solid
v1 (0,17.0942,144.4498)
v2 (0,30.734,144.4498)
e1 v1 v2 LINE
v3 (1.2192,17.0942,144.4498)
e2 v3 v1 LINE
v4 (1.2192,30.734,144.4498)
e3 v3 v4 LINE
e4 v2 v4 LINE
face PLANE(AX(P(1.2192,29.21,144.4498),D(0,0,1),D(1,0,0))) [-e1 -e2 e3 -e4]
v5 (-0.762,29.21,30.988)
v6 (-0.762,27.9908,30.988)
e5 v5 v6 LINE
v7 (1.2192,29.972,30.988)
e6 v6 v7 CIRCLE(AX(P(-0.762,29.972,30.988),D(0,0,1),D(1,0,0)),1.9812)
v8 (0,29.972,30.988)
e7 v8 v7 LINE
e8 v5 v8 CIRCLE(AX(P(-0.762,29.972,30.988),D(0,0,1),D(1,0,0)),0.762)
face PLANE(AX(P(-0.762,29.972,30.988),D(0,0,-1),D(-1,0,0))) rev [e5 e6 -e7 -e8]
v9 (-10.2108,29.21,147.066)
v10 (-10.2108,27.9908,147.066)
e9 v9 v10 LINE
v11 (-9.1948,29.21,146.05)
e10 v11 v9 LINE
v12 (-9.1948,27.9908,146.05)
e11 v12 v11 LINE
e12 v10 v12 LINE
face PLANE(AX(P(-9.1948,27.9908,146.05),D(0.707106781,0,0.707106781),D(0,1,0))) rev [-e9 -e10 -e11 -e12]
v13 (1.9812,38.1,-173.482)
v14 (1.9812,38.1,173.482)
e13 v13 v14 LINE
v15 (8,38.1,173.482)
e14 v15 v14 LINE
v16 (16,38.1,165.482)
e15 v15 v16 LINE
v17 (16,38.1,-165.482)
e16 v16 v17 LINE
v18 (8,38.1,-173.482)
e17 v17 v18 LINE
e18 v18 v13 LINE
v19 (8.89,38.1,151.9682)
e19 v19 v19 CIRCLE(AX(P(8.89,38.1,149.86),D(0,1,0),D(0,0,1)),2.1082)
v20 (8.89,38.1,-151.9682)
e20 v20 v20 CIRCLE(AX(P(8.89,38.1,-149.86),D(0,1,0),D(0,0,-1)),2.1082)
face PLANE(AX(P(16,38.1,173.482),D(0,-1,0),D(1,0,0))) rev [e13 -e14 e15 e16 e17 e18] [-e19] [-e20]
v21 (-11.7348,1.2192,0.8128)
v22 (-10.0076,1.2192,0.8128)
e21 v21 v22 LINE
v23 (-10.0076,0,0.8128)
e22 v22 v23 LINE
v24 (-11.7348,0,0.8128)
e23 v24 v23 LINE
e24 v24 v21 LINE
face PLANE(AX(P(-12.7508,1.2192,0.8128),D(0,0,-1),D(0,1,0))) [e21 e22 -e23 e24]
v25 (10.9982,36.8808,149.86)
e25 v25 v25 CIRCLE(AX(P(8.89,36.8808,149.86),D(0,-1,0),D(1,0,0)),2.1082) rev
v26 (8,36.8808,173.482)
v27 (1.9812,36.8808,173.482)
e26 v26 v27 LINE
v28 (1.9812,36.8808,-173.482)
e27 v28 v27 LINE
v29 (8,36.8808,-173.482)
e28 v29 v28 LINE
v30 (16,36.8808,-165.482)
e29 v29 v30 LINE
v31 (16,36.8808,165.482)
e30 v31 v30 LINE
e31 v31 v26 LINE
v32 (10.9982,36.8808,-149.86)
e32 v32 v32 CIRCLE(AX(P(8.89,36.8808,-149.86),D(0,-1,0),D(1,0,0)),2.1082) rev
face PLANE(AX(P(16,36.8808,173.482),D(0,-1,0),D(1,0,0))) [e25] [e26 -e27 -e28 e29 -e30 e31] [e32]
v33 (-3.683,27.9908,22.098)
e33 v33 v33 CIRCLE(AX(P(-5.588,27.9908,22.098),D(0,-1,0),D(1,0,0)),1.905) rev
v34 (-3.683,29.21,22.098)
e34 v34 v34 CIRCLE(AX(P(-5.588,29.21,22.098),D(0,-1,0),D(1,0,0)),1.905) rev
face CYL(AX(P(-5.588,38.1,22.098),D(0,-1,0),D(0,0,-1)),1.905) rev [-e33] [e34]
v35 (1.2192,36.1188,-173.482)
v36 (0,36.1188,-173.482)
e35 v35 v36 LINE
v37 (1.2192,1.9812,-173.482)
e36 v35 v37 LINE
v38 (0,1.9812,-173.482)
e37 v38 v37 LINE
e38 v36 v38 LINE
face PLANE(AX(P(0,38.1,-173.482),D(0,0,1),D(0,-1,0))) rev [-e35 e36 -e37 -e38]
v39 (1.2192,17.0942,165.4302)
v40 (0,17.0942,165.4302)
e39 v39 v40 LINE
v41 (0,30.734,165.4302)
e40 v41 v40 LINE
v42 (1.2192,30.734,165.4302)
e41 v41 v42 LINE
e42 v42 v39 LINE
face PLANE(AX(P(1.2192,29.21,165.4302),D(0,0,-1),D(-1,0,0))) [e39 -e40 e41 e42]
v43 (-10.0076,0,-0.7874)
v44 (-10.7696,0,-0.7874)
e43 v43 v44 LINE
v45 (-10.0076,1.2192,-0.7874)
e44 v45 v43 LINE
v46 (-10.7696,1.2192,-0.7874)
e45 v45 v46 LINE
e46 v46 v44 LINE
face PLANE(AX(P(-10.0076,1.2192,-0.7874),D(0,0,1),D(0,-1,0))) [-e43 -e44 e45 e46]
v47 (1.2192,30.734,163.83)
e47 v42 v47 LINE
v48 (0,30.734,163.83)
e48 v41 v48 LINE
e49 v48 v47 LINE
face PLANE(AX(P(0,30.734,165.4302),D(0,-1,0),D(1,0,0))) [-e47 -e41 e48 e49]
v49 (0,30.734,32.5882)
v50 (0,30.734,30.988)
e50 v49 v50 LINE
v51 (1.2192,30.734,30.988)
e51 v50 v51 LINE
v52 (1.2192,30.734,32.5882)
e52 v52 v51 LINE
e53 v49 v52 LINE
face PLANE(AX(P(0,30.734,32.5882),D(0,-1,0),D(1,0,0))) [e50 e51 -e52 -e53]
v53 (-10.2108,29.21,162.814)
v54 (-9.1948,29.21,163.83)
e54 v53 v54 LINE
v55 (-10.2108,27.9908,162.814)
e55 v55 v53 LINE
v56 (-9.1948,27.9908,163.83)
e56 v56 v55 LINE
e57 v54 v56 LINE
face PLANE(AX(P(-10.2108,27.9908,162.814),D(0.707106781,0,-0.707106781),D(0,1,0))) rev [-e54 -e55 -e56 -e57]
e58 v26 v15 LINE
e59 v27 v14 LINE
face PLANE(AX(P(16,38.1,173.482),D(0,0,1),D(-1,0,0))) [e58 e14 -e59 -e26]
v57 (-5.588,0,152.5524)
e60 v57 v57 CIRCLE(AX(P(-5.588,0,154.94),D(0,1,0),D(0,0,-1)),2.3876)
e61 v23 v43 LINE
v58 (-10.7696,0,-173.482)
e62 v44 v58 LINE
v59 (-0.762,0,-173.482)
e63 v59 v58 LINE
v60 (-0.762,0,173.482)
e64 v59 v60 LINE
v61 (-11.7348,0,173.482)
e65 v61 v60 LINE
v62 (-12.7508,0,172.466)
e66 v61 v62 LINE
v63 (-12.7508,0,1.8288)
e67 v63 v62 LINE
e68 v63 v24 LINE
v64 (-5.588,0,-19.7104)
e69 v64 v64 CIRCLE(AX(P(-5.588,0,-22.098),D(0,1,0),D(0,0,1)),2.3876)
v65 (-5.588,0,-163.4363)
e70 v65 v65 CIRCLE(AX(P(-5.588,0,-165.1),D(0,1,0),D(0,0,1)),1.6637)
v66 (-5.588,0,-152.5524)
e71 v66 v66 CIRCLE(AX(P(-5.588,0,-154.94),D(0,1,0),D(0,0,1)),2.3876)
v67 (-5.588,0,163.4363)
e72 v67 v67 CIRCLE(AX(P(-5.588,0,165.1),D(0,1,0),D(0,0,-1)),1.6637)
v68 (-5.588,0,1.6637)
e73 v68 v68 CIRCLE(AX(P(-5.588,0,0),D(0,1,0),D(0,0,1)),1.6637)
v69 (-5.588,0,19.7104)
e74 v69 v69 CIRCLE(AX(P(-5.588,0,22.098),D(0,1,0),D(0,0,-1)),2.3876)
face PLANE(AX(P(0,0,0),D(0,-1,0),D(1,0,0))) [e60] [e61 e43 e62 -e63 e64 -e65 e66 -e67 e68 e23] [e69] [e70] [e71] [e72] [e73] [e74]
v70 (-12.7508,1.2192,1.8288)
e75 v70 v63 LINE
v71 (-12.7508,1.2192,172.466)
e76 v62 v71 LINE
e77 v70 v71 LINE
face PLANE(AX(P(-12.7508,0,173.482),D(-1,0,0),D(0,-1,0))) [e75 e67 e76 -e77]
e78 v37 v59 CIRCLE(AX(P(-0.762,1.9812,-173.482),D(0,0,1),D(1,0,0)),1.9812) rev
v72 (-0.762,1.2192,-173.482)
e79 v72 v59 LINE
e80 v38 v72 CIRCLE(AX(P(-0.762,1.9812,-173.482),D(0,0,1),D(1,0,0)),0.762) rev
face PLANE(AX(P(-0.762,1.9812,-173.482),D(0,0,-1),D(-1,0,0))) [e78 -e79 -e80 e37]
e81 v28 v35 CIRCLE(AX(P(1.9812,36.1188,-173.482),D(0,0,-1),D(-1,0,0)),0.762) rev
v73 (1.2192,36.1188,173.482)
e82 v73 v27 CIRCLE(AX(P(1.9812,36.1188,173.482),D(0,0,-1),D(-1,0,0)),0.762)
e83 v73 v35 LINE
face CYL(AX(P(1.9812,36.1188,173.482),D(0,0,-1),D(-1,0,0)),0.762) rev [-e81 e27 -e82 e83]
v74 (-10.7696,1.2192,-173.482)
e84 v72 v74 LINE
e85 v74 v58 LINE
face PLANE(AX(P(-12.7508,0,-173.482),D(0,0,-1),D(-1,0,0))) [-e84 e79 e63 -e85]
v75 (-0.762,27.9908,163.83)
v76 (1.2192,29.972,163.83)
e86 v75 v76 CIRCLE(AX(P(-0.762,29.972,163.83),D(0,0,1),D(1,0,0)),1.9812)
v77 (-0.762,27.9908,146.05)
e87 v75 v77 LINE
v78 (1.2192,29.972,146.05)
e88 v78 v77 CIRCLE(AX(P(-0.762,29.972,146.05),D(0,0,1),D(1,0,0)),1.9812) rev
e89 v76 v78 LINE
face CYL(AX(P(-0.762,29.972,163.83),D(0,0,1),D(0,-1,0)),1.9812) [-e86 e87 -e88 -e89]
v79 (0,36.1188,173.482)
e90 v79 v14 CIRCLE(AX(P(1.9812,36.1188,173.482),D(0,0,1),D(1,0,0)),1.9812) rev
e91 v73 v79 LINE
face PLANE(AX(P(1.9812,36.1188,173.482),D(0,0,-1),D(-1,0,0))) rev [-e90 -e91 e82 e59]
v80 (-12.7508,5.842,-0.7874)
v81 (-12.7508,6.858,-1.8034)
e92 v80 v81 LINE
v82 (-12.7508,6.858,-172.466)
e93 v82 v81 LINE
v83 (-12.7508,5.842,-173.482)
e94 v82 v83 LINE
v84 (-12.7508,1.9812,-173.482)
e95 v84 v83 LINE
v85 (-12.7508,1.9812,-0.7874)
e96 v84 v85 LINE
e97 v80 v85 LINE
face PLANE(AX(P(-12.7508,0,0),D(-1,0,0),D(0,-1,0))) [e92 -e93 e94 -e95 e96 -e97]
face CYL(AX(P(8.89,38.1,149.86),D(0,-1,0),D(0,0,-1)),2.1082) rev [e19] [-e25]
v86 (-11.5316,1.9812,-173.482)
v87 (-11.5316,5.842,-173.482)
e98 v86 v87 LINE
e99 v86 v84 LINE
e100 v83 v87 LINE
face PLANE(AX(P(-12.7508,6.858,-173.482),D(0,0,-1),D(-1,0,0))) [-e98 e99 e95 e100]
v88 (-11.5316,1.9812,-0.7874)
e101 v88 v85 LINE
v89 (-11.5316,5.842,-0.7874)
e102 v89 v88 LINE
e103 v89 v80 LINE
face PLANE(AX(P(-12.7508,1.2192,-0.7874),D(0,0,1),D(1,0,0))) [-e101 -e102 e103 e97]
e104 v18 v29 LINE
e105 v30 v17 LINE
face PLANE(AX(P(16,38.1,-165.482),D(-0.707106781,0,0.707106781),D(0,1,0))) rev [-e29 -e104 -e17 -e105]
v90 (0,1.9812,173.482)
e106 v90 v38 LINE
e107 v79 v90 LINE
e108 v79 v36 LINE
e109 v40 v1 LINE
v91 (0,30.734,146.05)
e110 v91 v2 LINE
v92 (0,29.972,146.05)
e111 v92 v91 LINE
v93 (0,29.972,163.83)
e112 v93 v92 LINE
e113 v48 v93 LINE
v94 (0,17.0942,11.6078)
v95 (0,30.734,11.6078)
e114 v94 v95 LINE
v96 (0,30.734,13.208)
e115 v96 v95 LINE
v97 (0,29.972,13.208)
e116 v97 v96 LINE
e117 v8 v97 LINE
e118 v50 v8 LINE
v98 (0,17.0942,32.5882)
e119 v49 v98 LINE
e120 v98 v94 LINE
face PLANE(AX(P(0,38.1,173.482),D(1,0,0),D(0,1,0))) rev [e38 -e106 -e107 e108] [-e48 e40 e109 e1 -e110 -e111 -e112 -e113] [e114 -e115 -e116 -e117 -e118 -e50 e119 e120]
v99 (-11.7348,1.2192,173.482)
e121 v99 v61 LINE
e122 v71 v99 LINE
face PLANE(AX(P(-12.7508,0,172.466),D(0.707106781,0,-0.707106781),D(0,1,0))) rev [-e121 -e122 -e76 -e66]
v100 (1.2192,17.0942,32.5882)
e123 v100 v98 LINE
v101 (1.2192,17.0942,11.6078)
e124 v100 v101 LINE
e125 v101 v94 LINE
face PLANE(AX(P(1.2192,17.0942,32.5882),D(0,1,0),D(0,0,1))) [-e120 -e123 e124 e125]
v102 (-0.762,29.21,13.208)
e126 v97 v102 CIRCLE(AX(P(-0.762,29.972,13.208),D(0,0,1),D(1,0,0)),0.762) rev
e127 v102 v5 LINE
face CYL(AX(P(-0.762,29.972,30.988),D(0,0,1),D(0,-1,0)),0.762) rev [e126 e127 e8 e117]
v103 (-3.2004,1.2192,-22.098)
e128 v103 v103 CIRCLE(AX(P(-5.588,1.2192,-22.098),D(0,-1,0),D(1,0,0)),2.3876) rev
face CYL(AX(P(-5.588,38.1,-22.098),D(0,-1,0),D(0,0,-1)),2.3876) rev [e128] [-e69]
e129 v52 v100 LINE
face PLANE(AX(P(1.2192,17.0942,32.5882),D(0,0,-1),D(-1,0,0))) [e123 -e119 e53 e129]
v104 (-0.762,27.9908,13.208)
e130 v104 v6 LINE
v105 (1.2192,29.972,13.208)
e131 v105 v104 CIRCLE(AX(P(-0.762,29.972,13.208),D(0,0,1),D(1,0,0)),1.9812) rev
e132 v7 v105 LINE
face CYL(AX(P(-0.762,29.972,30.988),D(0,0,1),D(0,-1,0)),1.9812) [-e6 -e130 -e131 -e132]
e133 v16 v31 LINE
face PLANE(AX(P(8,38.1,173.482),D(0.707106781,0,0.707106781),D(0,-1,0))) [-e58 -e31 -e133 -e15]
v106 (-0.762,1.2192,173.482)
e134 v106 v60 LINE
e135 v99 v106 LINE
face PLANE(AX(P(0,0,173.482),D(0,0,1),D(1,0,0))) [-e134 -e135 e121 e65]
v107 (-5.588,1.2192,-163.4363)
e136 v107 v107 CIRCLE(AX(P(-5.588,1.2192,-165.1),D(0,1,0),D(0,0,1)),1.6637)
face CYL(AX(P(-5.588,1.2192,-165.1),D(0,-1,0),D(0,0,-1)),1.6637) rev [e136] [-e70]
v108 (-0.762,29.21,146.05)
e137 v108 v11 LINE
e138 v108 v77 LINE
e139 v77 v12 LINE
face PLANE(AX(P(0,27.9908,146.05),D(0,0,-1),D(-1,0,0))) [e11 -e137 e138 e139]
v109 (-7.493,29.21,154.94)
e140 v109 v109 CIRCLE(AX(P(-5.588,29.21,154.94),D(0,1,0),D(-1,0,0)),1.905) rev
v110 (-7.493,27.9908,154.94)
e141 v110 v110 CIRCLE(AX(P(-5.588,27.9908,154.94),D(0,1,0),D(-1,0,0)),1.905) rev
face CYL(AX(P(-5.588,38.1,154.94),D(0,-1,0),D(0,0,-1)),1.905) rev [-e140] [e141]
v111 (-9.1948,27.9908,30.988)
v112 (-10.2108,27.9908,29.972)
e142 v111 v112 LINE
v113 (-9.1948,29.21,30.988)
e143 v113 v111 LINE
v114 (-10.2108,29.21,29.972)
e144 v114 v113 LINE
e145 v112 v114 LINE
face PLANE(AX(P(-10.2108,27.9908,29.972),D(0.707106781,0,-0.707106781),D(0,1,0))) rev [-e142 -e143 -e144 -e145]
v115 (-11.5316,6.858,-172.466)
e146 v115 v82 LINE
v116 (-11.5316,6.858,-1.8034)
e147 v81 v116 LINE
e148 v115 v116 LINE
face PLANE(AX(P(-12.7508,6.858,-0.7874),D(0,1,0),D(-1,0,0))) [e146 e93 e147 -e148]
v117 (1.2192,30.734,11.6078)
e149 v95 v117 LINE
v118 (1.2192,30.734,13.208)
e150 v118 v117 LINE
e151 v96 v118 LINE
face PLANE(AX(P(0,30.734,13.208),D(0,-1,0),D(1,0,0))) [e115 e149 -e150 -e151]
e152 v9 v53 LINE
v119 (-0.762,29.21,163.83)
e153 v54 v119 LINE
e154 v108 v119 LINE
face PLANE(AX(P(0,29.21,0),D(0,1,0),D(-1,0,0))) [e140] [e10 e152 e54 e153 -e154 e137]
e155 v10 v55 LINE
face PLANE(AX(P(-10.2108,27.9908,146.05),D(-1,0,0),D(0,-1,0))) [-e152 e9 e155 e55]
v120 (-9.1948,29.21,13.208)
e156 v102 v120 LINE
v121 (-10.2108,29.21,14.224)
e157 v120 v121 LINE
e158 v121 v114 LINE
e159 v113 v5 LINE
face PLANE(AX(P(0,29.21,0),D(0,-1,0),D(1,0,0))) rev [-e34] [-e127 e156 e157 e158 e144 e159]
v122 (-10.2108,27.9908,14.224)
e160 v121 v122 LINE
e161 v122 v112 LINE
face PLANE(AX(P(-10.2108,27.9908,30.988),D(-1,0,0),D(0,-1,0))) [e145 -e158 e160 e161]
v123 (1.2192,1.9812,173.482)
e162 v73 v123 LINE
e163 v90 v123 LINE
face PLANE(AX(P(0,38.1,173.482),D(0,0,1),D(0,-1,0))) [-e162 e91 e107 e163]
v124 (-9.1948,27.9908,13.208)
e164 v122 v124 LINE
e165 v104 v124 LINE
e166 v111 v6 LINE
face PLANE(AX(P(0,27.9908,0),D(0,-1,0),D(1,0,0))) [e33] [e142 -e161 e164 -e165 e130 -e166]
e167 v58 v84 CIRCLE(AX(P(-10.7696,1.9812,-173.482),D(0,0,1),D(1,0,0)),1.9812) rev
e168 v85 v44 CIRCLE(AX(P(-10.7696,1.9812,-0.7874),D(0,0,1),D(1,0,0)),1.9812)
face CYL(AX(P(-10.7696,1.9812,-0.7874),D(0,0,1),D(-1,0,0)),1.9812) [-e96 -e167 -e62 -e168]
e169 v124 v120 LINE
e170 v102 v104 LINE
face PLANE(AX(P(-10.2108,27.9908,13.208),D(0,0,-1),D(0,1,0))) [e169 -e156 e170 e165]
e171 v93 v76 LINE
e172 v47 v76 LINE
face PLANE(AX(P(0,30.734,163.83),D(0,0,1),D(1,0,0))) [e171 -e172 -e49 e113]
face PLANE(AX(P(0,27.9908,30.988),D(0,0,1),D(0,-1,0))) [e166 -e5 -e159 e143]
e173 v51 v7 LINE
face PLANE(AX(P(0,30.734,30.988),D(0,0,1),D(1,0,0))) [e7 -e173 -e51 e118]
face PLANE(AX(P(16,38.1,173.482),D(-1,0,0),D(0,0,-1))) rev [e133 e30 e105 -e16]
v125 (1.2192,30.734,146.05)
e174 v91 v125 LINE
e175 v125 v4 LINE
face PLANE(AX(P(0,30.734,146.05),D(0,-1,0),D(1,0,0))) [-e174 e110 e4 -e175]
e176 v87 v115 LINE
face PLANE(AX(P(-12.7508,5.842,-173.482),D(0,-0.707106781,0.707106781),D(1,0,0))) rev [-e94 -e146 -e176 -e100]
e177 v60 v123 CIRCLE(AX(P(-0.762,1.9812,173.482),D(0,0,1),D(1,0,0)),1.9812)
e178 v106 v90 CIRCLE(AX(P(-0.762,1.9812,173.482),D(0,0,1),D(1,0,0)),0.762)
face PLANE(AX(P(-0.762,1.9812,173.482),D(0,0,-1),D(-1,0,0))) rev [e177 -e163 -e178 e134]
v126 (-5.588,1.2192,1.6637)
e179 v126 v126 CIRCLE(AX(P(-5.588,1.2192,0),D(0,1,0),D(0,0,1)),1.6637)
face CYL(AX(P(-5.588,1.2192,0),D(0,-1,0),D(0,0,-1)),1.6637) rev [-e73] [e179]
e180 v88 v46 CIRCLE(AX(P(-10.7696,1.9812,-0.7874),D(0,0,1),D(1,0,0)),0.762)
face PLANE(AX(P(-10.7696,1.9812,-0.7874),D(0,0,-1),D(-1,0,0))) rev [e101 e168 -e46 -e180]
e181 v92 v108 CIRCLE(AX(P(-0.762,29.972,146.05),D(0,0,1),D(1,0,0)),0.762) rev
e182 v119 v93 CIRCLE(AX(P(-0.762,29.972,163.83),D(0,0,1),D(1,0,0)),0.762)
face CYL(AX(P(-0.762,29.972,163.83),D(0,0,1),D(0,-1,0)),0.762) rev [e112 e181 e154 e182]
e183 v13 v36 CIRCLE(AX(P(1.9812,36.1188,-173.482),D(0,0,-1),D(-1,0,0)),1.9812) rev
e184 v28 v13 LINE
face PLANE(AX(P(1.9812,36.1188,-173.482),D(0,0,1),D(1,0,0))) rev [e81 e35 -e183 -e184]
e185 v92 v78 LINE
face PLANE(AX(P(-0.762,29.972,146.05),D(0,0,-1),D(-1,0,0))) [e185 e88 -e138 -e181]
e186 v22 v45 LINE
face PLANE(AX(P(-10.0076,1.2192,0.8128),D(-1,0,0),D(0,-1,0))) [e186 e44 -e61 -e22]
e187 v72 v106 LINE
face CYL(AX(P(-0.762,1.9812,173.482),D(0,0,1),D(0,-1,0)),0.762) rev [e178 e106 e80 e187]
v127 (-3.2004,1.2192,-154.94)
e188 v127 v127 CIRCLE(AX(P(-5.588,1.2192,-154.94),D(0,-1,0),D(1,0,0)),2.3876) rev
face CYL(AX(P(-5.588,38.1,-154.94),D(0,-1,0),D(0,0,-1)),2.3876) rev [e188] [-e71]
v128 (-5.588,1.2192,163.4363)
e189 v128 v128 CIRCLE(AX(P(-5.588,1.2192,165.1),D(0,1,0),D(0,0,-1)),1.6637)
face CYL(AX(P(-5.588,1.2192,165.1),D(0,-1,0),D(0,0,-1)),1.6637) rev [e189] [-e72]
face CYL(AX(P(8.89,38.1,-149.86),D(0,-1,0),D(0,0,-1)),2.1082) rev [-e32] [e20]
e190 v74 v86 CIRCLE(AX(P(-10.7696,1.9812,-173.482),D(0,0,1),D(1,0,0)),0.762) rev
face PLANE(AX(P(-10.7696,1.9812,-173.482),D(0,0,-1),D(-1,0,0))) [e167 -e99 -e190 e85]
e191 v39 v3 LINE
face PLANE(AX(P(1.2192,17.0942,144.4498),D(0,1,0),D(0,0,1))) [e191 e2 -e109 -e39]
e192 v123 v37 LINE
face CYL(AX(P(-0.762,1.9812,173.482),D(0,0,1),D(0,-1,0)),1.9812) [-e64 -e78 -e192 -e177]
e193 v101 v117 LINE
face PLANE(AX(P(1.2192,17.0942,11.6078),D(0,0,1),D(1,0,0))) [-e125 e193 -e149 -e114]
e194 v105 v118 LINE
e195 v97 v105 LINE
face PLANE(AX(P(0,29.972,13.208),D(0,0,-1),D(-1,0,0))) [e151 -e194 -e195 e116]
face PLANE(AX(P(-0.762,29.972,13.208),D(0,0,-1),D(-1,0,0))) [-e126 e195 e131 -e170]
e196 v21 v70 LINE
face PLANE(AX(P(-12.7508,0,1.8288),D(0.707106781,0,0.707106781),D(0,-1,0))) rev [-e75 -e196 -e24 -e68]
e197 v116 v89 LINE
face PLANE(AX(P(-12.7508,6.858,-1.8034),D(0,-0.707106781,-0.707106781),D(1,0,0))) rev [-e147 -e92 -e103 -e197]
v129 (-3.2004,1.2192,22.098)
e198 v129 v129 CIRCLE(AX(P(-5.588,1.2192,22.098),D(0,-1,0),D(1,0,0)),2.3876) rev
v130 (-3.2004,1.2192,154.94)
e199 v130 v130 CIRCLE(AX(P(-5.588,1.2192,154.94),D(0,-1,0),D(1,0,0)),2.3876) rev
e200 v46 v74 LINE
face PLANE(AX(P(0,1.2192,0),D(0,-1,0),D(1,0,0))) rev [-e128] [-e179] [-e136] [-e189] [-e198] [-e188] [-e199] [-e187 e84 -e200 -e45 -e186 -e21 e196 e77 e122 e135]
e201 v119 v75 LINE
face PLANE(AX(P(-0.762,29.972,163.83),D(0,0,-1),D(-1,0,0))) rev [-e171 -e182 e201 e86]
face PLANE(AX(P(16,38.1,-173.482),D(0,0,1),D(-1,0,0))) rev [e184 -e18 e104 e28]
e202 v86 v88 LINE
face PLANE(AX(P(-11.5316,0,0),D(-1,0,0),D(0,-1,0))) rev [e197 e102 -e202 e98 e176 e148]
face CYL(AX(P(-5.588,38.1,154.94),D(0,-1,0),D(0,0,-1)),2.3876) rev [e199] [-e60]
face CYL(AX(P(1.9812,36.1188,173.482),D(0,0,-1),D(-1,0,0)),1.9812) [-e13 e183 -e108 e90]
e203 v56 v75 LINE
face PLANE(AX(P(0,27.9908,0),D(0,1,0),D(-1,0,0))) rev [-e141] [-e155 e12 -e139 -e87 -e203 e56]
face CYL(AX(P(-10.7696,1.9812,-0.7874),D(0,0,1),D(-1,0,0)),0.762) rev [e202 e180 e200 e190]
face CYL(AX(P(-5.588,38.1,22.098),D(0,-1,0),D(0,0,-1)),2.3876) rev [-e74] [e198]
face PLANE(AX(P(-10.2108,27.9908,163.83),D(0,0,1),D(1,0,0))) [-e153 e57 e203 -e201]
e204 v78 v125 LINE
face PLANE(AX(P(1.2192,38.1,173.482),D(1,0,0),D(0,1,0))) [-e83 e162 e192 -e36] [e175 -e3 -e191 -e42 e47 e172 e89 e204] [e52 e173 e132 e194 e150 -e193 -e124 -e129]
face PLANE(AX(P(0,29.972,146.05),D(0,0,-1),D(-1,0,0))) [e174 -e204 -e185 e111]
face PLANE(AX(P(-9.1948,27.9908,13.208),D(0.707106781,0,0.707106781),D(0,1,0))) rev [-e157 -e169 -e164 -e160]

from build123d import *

# Parameters (mm, degrees)
SKETCH2_W                            = 16
SKETCH2_H                            = 38.1
BOSS_EXTRUDE1_DEPTH                  = 173.482
CONVERT_SOLID1_START                 = -173.482
CONVERT_SOLID1_DEPTH                 = 346.964
EDGE_FLANGE2_STRIP_W                 = 6.4008
EDGE_FLANGE2_STRIP_H                 = 1.2192
EDGE_FLANGE2_STRIP_CUT_DEPTH         = 346.964
EDGE_FLANGE2_DEPTH                   = 346.964
EDGE_FLANGE3_STRIP_W                 = 6.4008
EDGE_FLANGE3_STRIP_H                 = 1.2192
EDGE_FLANGE3_STRIP_CUT_DEPTH         = 172.6946
EDGE_FLANGE3_RELIEF_W                = 7.1628
EDGE_FLANGE3_RELIEF_H                = 1.6002
EDGE_FLANGE3_RELIEF_CUT_DEPTH        = 1.2192
EDGE_FLANGE3_DEPTH                   = 172.6946
PEM_CLEARANCE_HOLES_R                = 2.3876
CUT_EXTRUDE4_DEPTH                   = 179.335678775
TOP_PLATE_ATTACHMENT_PEM_HOLES_R     = 2.1082
CUT_EXTRUDE5_DEPTH                   = 179.335678775
CHAMFER2_SIZE                        = 8
SKETCH17_W                           = 20.9804
SKETCH17_H                           = 12.1158
CUT_EXTRUDE7_DEPTH                   = 1.2192
EDGE_FLANGE4_STRIP_W                 = 6.4008
EDGE_FLANGE4_STRIP_H                 = 1.2192
EDGE_FLANGE4_STRIP_CUT_DEPTH         = 17.78
EDGE_FLANGE4_RELIEF_W                = 7.1628
EDGE_FLANGE4_RELIEF_H                = 1.6002
EDGE_FLANGE4_RELIEF_CUT_DEPTH        = 1.2192
EDGE_FLANGE4_STRIP_2_W               = 6.4008
EDGE_FLANGE4_STRIP_2_H               = 1.2192
EDGE_FLANGE4_STRIP_CUT_2_DEPTH       = 17.78
EDGE_FLANGE4_RELIEF_2_W              = 7.1628
EDGE_FLANGE4_RELIEF_2_H              = 1.6002
EDGE_FLANGE4_RELIEF_CUT_2_DEPTH      = 1.2192
EDGE_FLANGE4_DEPTH                   = 17.78
EDGE_FLANGE4_BEND_DEPTH              = 17.78
BASE_MOUNTING_RIVET_CLAMPING_HOLES_R = 1.6637
CUT_EXTRUDE8_DEPTH                   = 1.2192
SKETCH29_R                           = 1.905
CUT_EXTRUDE11_DEPTH                  = 179.335678775
CHAMFER3_SIZE                        = 1.016


# Read off the part's stored shape, not the designer's step: Convert-Solid1
# Sheet-metal steps are written as plain solids
with BuildPart() as part:
    # Sketch2 → Boss-Extrude1 (new, symmetric)
    with BuildSketch(Plane.XY):
        with Locations((8, 19.05)):
            Rectangle(SKETCH2_W, SKETCH2_H)
    extrude(amount=BOSS_EXTRUDE1_DEPTH, both=True)

    # Convert-Solid1 outline → Convert-Solid1 (cut)
    with BuildSketch(Plane.XY.offset(CONVERT_SOLID1_START)):
        with BuildLine():
            Line((0, 38.1), (0, 36.1188))
            ThreePointArc((0, 36.1188), (0.580280045, 37.519719955), (1.9812, 38.1))
            Line((1.9812, 38.1), (0, 38.1))
        make_face()
        with BuildLine():
            Line((1.2192, 36.1188), (1.2192, 0))
            Line((1.2192, 0), (16, 0))
            Line((16, 0), (16, 36.8808))
            Line((16, 36.8808), (1.9812, 36.8808))
            ThreePointArc((1.9812, 36.8808), (1.442384633, 36.657615367), (1.2192, 36.1188))
        make_face()
    extrude(amount=CONVERT_SOLID1_DEPTH, mode=Mode.SUBTRACT)

    # Edge-Flange2 strip (across the edge) → Edge-Flange2 strip cut (cut)
    with BuildSketch(Plane(origin=(0, 0, -173.482), x_dir=(0, 1, 0), z_dir=(0, 0, 1))):
        with Locations((-1.2192, -0.6096)):
            Rectangle(EDGE_FLANGE2_STRIP_W, EDGE_FLANGE2_STRIP_H)
    extrude(amount=EDGE_FLANGE2_STRIP_CUT_DEPTH, mode=Mode.SUBTRACT)

    # Edge-Flange2 section (across the edge) → Edge-Flange2 (add)
    with BuildSketch(Plane(origin=(0, 0, -173.482), x_dir=(0, 1, 0), z_dir=(0, 0, 1))):
        with BuildLine():
            Line((0, 0.762), (0, 12.7508))
            Line((0, 12.7508), (1.2192, 12.7508))
            Line((1.2192, 12.7508), (1.2192, 0.762))
            ThreePointArc((1.2192, 0.762), (1.442384633, 0.223184633), (1.9812, 0))
            Line((1.9812, 0), (1.9812, -1.2192))
            ThreePointArc((1.9812, -1.2192), (0.580280045, -0.638919955), (0, 0.762))
        make_face()
    extrude(amount=EDGE_FLANGE2_DEPTH)

    # Edge-Flange3 strip (across the edge) → Edge-Flange3 strip cut (cut)
    with BuildSketch(Plane(origin=(-12.7508, 1.2192, -173.482), x_dir=(1, 0, 0), z_dir=(0, 0, 1))):
        with Locations((-1.2192, -0.6096)):
            Rectangle(EDGE_FLANGE3_STRIP_W, EDGE_FLANGE3_STRIP_H)
    extrude(amount=EDGE_FLANGE3_STRIP_CUT_DEPTH, mode=Mode.SUBTRACT)

    # Edge-Flange3 relief (on the sheet) → Edge-Flange3 relief cut (cut)
    with BuildSketch(Plane(origin=(-10.7696, 1.2192, -173.482), x_dir=(1, 0, 0), z_dir=(0, 1, 0))):
        with Locations((-2.8194, -173.4947)):
            Rectangle(EDGE_FLANGE3_RELIEF_W, EDGE_FLANGE3_RELIEF_H)
    extrude(amount=-EDGE_FLANGE3_RELIEF_CUT_DEPTH, mode=Mode.SUBTRACT)

    # Edge-Flange3 section (across the edge) → Edge-Flange3 (add)
    with BuildSketch(Plane(origin=(-12.7508, 1.2192, -173.482), x_dir=(1, 0, 0), z_dir=(0, 0, 1))):
        with BuildLine():
            Line((0, 0.762), (0, 5.6388))
            Line((0, 5.6388), (1.2192, 5.6388))
            Line((1.2192, 5.6388), (1.2192, 0.762))
            ThreePointArc((1.2192, 0.762), (1.442384633, 0.223184633), (1.9812, 0))
            Line((1.9812, 0), (1.9812, -1.2192))
            ThreePointArc((1.9812, -1.2192), (0.580280045, -0.638919955), (0, 0.762))
        make_face()
    extrude(amount=EDGE_FLANGE3_DEPTH)

    # PEM Clearance Holes → Cut-Extrude4 (cut, through all)
    with BuildSketch(Plane(origin=(0, 0, 0), x_dir=(1, 0, 0), z_dir=(0, 1, 0))):
        with Locations((-5.588, 22.098)):
            Circle(PEM_CLEARANCE_HOLES_R)
        with Locations((-5.588, 154.94)):
            Circle(PEM_CLEARANCE_HOLES_R)
        with Locations(Location((-5.588, -154.94, 0), (0, 0, 90))):
            Circle(PEM_CLEARANCE_HOLES_R)
        with Locations(Location((-5.588, -22.098, 0), (0, 0, 90))):
            Circle(PEM_CLEARANCE_HOLES_R)
    extrude(amount=CUT_EXTRUDE4_DEPTH, mode=Mode.SUBTRACT)

    # Top Plate Attachment PEM Holes → Cut-Extrude5 (cut, through all)
    with BuildSketch(Plane(origin=(0, 0, 0), x_dir=(1, 0, 0), z_dir=(0, 1, 0))):
        with Locations((8.89, -149.86)):
            Circle(TOP_PLATE_ATTACHMENT_PEM_HOLES_R)
        with Locations(Location((8.89, 149.86, 0), (0, 0, 90))):
            Circle(TOP_PLATE_ATTACHMENT_PEM_HOLES_R)
    extrude(amount=CUT_EXTRUDE5_DEPTH, mode=Mode.SUBTRACT)

    # Chamfer2
    chamfer2_edges = [part.edges().sort_by_distance(p)[0] for p in [
        (16, 37.4904, -173.482),
        (16, 37.4904, 173.482),
    ]]
    chamfer(chamfer2_edges, length=CHAMFER2_SIZE)

    # Sketch17 → Cut-Extrude7 (cut)
    with BuildSketch(Plane(origin=(0, 0, 0), x_dir=(0, 0, -1), z_dir=(1, 0, 0))):
        with Locations((-22.098, 23.1521)):
            Rectangle(SKETCH17_W, SKETCH17_H)
        with Locations((-154.94, 23.1521)):
            Rectangle(SKETCH17_W, SKETCH17_H)
    extrude(amount=CUT_EXTRUDE7_DEPTH, mode=Mode.SUBTRACT)

    # Edge-Flange4 strip (across the edge) → Edge-Flange4 strip cut (cut)
    with BuildSketch(Plane(origin=(0, 29.21, 13.208), x_dir=(0, 1, 0), z_dir=(0, 0, 1))):
        with Locations((-2.4384, -0.6096)):
            Rectangle(EDGE_FLANGE4_STRIP_W, EDGE_FLANGE4_STRIP_H)
    extrude(amount=EDGE_FLANGE4_STRIP_CUT_DEPTH, mode=Mode.SUBTRACT)

    # Edge-Flange4 relief (on the sheet) → Edge-Flange4 relief cut (cut)
    with BuildSketch(Plane(origin=(0, 29.972, 13.208), x_dir=(0, 1, 0), z_dir=(-1, 0, 0))):
        with Locations((-2.8194, 0.8001)):
            Rectangle(EDGE_FLANGE4_RELIEF_W, EDGE_FLANGE4_RELIEF_H)
        with Locations((-2.8194, -18.5801)):
            Rectangle(EDGE_FLANGE4_RELIEF_W, EDGE_FLANGE4_RELIEF_H)
    extrude(amount=-EDGE_FLANGE4_RELIEF_CUT_DEPTH, mode=Mode.SUBTRACT)

    # Edge-Flange4 strip 2 (across the edge) → Edge-Flange4 strip cut 2 (cut)
    with BuildSketch(Plane(origin=(0, 29.21, 146.05), x_dir=(0, 1, 0), z_dir=(0, 0, 1))):
        with Locations((-2.4384, -0.6096)):
            Rectangle(EDGE_FLANGE4_STRIP_2_W, EDGE_FLANGE4_STRIP_2_H)
    extrude(amount=EDGE_FLANGE4_STRIP_CUT_2_DEPTH, mode=Mode.SUBTRACT)

    # Edge-Flange4 relief 2 (on the sheet) → Edge-Flange4 relief cut 2 (cut)
    with BuildSketch(Plane(origin=(0, 29.972, 146.05), x_dir=(0, 1, 0), z_dir=(-1, 0, 0))):
        with Locations((-2.8194, 0.8001)):
            Rectangle(EDGE_FLANGE4_RELIEF_2_W, EDGE_FLANGE4_RELIEF_2_H)
        with Locations((-2.8194, -18.5801)):
            Rectangle(EDGE_FLANGE4_RELIEF_2_W, EDGE_FLANGE4_RELIEF_2_H)
    extrude(amount=-EDGE_FLANGE4_RELIEF_CUT_2_DEPTH, mode=Mode.SUBTRACT)

    # Edge-Flange4 section (across the edge) → Edge-Flange4 (add)
    with BuildSketch(Plane(origin=(0, 29.21, 13.208), x_dir=(0, 1, 0), z_dir=(0, 0, 1))):
        with BuildLine():
            Line((-1.2192, 0.762), (-1.2192, 10.2108))
            Line((-1.2192, 10.2108), (0, 10.2108))
            Line((0, 10.2108), (0, 0.762))
            ThreePointArc((0, 0.762), (0.223184633, 0.223184633), (0.762, 0))
            Line((0.762, 0), (0.762, -1.2192))
            ThreePointArc((0.762, -1.2192), (-0.638919955, -0.638919955), (-1.2192, 0.762))
        make_face()
    extrude(amount=EDGE_FLANGE4_DEPTH)

    # Edge-Flange4 section 2 (across the edge) → Edge-Flange4 bend (add)
    with BuildSketch(Plane(origin=(0, 29.21, 146.05), x_dir=(0, 1, 0), z_dir=(0, 0, 1))):
        with BuildLine():
            Line((-1.2192, 0.762), (-1.2192, 10.2108))
            Line((-1.2192, 10.2108), (0, 10.2108))
            Line((0, 10.2108), (0, 0.762))
            ThreePointArc((0, 0.762), (0.223184633, 0.223184633), (0.762, 0))
            Line((0.762, 0), (0.762, -1.2192))
            ThreePointArc((0.762, -1.2192), (-0.638919955, -0.638919955), (-1.2192, 0.762))
        make_face()
    extrude(amount=EDGE_FLANGE4_BEND_DEPTH)

    # Base Mounting Rivet Clamping Holes → Cut-Extrude8 (cut)
    with BuildSketch(Plane(origin=(0, 0, 0), x_dir=(1, 0, 0), z_dir=(0, 1, 0))):
        with Locations(Location((-5.588, -165.1, 0), (0, 0, 90))):
            Circle(BASE_MOUNTING_RIVET_CLAMPING_HOLES_R)
        with Locations(Location((-5.588, 0, 0), (0, 0, 270))):
            Circle(BASE_MOUNTING_RIVET_CLAMPING_HOLES_R)
        with Locations(Location((-5.588, 165.1, 0), (0, 0, 270))):
            Circle(BASE_MOUNTING_RIVET_CLAMPING_HOLES_R)
    extrude(amount=CUT_EXTRUDE8_DEPTH, mode=Mode.SUBTRACT)

    # Sketch29 → Cut-Extrude11 (cut, through all)
    with BuildSketch(Plane(origin=(0, 0, 0), x_dir=(1, 0, 0), z_dir=(0, 1, 0))):
        with Locations((-5.588, -22.098)):
            Circle(SKETCH29_R)
        with Locations(Location((-5.588, -154.94, 0), (0, 0, 180))):
            Circle(SKETCH29_R)
    extrude(amount=CUT_EXTRUDE11_DEPTH, mode=Mode.SUBTRACT)

    # Chamfer3
    chamfer3_edges = [part.edges().sort_by_distance(p)[0] for p in [
        (-10.2108, 28.6004, 13.208),
        (-10.2108, 28.6004, 30.988),
        (-10.2108, 28.6004, 146.05),
        (-10.2108, 28.6004, 163.83),
        (-12.7508, 0.6096, 173.482),
        (-12.7508, 0.6096, 0.8128),
        (-12.1412, 6.858, -173.482),
        (-12.1412, 6.858, -0.7874),
    ]]
    chamfer(chamfer3_edges, length=CHAMFER3_SIZE)


solid = part.part
